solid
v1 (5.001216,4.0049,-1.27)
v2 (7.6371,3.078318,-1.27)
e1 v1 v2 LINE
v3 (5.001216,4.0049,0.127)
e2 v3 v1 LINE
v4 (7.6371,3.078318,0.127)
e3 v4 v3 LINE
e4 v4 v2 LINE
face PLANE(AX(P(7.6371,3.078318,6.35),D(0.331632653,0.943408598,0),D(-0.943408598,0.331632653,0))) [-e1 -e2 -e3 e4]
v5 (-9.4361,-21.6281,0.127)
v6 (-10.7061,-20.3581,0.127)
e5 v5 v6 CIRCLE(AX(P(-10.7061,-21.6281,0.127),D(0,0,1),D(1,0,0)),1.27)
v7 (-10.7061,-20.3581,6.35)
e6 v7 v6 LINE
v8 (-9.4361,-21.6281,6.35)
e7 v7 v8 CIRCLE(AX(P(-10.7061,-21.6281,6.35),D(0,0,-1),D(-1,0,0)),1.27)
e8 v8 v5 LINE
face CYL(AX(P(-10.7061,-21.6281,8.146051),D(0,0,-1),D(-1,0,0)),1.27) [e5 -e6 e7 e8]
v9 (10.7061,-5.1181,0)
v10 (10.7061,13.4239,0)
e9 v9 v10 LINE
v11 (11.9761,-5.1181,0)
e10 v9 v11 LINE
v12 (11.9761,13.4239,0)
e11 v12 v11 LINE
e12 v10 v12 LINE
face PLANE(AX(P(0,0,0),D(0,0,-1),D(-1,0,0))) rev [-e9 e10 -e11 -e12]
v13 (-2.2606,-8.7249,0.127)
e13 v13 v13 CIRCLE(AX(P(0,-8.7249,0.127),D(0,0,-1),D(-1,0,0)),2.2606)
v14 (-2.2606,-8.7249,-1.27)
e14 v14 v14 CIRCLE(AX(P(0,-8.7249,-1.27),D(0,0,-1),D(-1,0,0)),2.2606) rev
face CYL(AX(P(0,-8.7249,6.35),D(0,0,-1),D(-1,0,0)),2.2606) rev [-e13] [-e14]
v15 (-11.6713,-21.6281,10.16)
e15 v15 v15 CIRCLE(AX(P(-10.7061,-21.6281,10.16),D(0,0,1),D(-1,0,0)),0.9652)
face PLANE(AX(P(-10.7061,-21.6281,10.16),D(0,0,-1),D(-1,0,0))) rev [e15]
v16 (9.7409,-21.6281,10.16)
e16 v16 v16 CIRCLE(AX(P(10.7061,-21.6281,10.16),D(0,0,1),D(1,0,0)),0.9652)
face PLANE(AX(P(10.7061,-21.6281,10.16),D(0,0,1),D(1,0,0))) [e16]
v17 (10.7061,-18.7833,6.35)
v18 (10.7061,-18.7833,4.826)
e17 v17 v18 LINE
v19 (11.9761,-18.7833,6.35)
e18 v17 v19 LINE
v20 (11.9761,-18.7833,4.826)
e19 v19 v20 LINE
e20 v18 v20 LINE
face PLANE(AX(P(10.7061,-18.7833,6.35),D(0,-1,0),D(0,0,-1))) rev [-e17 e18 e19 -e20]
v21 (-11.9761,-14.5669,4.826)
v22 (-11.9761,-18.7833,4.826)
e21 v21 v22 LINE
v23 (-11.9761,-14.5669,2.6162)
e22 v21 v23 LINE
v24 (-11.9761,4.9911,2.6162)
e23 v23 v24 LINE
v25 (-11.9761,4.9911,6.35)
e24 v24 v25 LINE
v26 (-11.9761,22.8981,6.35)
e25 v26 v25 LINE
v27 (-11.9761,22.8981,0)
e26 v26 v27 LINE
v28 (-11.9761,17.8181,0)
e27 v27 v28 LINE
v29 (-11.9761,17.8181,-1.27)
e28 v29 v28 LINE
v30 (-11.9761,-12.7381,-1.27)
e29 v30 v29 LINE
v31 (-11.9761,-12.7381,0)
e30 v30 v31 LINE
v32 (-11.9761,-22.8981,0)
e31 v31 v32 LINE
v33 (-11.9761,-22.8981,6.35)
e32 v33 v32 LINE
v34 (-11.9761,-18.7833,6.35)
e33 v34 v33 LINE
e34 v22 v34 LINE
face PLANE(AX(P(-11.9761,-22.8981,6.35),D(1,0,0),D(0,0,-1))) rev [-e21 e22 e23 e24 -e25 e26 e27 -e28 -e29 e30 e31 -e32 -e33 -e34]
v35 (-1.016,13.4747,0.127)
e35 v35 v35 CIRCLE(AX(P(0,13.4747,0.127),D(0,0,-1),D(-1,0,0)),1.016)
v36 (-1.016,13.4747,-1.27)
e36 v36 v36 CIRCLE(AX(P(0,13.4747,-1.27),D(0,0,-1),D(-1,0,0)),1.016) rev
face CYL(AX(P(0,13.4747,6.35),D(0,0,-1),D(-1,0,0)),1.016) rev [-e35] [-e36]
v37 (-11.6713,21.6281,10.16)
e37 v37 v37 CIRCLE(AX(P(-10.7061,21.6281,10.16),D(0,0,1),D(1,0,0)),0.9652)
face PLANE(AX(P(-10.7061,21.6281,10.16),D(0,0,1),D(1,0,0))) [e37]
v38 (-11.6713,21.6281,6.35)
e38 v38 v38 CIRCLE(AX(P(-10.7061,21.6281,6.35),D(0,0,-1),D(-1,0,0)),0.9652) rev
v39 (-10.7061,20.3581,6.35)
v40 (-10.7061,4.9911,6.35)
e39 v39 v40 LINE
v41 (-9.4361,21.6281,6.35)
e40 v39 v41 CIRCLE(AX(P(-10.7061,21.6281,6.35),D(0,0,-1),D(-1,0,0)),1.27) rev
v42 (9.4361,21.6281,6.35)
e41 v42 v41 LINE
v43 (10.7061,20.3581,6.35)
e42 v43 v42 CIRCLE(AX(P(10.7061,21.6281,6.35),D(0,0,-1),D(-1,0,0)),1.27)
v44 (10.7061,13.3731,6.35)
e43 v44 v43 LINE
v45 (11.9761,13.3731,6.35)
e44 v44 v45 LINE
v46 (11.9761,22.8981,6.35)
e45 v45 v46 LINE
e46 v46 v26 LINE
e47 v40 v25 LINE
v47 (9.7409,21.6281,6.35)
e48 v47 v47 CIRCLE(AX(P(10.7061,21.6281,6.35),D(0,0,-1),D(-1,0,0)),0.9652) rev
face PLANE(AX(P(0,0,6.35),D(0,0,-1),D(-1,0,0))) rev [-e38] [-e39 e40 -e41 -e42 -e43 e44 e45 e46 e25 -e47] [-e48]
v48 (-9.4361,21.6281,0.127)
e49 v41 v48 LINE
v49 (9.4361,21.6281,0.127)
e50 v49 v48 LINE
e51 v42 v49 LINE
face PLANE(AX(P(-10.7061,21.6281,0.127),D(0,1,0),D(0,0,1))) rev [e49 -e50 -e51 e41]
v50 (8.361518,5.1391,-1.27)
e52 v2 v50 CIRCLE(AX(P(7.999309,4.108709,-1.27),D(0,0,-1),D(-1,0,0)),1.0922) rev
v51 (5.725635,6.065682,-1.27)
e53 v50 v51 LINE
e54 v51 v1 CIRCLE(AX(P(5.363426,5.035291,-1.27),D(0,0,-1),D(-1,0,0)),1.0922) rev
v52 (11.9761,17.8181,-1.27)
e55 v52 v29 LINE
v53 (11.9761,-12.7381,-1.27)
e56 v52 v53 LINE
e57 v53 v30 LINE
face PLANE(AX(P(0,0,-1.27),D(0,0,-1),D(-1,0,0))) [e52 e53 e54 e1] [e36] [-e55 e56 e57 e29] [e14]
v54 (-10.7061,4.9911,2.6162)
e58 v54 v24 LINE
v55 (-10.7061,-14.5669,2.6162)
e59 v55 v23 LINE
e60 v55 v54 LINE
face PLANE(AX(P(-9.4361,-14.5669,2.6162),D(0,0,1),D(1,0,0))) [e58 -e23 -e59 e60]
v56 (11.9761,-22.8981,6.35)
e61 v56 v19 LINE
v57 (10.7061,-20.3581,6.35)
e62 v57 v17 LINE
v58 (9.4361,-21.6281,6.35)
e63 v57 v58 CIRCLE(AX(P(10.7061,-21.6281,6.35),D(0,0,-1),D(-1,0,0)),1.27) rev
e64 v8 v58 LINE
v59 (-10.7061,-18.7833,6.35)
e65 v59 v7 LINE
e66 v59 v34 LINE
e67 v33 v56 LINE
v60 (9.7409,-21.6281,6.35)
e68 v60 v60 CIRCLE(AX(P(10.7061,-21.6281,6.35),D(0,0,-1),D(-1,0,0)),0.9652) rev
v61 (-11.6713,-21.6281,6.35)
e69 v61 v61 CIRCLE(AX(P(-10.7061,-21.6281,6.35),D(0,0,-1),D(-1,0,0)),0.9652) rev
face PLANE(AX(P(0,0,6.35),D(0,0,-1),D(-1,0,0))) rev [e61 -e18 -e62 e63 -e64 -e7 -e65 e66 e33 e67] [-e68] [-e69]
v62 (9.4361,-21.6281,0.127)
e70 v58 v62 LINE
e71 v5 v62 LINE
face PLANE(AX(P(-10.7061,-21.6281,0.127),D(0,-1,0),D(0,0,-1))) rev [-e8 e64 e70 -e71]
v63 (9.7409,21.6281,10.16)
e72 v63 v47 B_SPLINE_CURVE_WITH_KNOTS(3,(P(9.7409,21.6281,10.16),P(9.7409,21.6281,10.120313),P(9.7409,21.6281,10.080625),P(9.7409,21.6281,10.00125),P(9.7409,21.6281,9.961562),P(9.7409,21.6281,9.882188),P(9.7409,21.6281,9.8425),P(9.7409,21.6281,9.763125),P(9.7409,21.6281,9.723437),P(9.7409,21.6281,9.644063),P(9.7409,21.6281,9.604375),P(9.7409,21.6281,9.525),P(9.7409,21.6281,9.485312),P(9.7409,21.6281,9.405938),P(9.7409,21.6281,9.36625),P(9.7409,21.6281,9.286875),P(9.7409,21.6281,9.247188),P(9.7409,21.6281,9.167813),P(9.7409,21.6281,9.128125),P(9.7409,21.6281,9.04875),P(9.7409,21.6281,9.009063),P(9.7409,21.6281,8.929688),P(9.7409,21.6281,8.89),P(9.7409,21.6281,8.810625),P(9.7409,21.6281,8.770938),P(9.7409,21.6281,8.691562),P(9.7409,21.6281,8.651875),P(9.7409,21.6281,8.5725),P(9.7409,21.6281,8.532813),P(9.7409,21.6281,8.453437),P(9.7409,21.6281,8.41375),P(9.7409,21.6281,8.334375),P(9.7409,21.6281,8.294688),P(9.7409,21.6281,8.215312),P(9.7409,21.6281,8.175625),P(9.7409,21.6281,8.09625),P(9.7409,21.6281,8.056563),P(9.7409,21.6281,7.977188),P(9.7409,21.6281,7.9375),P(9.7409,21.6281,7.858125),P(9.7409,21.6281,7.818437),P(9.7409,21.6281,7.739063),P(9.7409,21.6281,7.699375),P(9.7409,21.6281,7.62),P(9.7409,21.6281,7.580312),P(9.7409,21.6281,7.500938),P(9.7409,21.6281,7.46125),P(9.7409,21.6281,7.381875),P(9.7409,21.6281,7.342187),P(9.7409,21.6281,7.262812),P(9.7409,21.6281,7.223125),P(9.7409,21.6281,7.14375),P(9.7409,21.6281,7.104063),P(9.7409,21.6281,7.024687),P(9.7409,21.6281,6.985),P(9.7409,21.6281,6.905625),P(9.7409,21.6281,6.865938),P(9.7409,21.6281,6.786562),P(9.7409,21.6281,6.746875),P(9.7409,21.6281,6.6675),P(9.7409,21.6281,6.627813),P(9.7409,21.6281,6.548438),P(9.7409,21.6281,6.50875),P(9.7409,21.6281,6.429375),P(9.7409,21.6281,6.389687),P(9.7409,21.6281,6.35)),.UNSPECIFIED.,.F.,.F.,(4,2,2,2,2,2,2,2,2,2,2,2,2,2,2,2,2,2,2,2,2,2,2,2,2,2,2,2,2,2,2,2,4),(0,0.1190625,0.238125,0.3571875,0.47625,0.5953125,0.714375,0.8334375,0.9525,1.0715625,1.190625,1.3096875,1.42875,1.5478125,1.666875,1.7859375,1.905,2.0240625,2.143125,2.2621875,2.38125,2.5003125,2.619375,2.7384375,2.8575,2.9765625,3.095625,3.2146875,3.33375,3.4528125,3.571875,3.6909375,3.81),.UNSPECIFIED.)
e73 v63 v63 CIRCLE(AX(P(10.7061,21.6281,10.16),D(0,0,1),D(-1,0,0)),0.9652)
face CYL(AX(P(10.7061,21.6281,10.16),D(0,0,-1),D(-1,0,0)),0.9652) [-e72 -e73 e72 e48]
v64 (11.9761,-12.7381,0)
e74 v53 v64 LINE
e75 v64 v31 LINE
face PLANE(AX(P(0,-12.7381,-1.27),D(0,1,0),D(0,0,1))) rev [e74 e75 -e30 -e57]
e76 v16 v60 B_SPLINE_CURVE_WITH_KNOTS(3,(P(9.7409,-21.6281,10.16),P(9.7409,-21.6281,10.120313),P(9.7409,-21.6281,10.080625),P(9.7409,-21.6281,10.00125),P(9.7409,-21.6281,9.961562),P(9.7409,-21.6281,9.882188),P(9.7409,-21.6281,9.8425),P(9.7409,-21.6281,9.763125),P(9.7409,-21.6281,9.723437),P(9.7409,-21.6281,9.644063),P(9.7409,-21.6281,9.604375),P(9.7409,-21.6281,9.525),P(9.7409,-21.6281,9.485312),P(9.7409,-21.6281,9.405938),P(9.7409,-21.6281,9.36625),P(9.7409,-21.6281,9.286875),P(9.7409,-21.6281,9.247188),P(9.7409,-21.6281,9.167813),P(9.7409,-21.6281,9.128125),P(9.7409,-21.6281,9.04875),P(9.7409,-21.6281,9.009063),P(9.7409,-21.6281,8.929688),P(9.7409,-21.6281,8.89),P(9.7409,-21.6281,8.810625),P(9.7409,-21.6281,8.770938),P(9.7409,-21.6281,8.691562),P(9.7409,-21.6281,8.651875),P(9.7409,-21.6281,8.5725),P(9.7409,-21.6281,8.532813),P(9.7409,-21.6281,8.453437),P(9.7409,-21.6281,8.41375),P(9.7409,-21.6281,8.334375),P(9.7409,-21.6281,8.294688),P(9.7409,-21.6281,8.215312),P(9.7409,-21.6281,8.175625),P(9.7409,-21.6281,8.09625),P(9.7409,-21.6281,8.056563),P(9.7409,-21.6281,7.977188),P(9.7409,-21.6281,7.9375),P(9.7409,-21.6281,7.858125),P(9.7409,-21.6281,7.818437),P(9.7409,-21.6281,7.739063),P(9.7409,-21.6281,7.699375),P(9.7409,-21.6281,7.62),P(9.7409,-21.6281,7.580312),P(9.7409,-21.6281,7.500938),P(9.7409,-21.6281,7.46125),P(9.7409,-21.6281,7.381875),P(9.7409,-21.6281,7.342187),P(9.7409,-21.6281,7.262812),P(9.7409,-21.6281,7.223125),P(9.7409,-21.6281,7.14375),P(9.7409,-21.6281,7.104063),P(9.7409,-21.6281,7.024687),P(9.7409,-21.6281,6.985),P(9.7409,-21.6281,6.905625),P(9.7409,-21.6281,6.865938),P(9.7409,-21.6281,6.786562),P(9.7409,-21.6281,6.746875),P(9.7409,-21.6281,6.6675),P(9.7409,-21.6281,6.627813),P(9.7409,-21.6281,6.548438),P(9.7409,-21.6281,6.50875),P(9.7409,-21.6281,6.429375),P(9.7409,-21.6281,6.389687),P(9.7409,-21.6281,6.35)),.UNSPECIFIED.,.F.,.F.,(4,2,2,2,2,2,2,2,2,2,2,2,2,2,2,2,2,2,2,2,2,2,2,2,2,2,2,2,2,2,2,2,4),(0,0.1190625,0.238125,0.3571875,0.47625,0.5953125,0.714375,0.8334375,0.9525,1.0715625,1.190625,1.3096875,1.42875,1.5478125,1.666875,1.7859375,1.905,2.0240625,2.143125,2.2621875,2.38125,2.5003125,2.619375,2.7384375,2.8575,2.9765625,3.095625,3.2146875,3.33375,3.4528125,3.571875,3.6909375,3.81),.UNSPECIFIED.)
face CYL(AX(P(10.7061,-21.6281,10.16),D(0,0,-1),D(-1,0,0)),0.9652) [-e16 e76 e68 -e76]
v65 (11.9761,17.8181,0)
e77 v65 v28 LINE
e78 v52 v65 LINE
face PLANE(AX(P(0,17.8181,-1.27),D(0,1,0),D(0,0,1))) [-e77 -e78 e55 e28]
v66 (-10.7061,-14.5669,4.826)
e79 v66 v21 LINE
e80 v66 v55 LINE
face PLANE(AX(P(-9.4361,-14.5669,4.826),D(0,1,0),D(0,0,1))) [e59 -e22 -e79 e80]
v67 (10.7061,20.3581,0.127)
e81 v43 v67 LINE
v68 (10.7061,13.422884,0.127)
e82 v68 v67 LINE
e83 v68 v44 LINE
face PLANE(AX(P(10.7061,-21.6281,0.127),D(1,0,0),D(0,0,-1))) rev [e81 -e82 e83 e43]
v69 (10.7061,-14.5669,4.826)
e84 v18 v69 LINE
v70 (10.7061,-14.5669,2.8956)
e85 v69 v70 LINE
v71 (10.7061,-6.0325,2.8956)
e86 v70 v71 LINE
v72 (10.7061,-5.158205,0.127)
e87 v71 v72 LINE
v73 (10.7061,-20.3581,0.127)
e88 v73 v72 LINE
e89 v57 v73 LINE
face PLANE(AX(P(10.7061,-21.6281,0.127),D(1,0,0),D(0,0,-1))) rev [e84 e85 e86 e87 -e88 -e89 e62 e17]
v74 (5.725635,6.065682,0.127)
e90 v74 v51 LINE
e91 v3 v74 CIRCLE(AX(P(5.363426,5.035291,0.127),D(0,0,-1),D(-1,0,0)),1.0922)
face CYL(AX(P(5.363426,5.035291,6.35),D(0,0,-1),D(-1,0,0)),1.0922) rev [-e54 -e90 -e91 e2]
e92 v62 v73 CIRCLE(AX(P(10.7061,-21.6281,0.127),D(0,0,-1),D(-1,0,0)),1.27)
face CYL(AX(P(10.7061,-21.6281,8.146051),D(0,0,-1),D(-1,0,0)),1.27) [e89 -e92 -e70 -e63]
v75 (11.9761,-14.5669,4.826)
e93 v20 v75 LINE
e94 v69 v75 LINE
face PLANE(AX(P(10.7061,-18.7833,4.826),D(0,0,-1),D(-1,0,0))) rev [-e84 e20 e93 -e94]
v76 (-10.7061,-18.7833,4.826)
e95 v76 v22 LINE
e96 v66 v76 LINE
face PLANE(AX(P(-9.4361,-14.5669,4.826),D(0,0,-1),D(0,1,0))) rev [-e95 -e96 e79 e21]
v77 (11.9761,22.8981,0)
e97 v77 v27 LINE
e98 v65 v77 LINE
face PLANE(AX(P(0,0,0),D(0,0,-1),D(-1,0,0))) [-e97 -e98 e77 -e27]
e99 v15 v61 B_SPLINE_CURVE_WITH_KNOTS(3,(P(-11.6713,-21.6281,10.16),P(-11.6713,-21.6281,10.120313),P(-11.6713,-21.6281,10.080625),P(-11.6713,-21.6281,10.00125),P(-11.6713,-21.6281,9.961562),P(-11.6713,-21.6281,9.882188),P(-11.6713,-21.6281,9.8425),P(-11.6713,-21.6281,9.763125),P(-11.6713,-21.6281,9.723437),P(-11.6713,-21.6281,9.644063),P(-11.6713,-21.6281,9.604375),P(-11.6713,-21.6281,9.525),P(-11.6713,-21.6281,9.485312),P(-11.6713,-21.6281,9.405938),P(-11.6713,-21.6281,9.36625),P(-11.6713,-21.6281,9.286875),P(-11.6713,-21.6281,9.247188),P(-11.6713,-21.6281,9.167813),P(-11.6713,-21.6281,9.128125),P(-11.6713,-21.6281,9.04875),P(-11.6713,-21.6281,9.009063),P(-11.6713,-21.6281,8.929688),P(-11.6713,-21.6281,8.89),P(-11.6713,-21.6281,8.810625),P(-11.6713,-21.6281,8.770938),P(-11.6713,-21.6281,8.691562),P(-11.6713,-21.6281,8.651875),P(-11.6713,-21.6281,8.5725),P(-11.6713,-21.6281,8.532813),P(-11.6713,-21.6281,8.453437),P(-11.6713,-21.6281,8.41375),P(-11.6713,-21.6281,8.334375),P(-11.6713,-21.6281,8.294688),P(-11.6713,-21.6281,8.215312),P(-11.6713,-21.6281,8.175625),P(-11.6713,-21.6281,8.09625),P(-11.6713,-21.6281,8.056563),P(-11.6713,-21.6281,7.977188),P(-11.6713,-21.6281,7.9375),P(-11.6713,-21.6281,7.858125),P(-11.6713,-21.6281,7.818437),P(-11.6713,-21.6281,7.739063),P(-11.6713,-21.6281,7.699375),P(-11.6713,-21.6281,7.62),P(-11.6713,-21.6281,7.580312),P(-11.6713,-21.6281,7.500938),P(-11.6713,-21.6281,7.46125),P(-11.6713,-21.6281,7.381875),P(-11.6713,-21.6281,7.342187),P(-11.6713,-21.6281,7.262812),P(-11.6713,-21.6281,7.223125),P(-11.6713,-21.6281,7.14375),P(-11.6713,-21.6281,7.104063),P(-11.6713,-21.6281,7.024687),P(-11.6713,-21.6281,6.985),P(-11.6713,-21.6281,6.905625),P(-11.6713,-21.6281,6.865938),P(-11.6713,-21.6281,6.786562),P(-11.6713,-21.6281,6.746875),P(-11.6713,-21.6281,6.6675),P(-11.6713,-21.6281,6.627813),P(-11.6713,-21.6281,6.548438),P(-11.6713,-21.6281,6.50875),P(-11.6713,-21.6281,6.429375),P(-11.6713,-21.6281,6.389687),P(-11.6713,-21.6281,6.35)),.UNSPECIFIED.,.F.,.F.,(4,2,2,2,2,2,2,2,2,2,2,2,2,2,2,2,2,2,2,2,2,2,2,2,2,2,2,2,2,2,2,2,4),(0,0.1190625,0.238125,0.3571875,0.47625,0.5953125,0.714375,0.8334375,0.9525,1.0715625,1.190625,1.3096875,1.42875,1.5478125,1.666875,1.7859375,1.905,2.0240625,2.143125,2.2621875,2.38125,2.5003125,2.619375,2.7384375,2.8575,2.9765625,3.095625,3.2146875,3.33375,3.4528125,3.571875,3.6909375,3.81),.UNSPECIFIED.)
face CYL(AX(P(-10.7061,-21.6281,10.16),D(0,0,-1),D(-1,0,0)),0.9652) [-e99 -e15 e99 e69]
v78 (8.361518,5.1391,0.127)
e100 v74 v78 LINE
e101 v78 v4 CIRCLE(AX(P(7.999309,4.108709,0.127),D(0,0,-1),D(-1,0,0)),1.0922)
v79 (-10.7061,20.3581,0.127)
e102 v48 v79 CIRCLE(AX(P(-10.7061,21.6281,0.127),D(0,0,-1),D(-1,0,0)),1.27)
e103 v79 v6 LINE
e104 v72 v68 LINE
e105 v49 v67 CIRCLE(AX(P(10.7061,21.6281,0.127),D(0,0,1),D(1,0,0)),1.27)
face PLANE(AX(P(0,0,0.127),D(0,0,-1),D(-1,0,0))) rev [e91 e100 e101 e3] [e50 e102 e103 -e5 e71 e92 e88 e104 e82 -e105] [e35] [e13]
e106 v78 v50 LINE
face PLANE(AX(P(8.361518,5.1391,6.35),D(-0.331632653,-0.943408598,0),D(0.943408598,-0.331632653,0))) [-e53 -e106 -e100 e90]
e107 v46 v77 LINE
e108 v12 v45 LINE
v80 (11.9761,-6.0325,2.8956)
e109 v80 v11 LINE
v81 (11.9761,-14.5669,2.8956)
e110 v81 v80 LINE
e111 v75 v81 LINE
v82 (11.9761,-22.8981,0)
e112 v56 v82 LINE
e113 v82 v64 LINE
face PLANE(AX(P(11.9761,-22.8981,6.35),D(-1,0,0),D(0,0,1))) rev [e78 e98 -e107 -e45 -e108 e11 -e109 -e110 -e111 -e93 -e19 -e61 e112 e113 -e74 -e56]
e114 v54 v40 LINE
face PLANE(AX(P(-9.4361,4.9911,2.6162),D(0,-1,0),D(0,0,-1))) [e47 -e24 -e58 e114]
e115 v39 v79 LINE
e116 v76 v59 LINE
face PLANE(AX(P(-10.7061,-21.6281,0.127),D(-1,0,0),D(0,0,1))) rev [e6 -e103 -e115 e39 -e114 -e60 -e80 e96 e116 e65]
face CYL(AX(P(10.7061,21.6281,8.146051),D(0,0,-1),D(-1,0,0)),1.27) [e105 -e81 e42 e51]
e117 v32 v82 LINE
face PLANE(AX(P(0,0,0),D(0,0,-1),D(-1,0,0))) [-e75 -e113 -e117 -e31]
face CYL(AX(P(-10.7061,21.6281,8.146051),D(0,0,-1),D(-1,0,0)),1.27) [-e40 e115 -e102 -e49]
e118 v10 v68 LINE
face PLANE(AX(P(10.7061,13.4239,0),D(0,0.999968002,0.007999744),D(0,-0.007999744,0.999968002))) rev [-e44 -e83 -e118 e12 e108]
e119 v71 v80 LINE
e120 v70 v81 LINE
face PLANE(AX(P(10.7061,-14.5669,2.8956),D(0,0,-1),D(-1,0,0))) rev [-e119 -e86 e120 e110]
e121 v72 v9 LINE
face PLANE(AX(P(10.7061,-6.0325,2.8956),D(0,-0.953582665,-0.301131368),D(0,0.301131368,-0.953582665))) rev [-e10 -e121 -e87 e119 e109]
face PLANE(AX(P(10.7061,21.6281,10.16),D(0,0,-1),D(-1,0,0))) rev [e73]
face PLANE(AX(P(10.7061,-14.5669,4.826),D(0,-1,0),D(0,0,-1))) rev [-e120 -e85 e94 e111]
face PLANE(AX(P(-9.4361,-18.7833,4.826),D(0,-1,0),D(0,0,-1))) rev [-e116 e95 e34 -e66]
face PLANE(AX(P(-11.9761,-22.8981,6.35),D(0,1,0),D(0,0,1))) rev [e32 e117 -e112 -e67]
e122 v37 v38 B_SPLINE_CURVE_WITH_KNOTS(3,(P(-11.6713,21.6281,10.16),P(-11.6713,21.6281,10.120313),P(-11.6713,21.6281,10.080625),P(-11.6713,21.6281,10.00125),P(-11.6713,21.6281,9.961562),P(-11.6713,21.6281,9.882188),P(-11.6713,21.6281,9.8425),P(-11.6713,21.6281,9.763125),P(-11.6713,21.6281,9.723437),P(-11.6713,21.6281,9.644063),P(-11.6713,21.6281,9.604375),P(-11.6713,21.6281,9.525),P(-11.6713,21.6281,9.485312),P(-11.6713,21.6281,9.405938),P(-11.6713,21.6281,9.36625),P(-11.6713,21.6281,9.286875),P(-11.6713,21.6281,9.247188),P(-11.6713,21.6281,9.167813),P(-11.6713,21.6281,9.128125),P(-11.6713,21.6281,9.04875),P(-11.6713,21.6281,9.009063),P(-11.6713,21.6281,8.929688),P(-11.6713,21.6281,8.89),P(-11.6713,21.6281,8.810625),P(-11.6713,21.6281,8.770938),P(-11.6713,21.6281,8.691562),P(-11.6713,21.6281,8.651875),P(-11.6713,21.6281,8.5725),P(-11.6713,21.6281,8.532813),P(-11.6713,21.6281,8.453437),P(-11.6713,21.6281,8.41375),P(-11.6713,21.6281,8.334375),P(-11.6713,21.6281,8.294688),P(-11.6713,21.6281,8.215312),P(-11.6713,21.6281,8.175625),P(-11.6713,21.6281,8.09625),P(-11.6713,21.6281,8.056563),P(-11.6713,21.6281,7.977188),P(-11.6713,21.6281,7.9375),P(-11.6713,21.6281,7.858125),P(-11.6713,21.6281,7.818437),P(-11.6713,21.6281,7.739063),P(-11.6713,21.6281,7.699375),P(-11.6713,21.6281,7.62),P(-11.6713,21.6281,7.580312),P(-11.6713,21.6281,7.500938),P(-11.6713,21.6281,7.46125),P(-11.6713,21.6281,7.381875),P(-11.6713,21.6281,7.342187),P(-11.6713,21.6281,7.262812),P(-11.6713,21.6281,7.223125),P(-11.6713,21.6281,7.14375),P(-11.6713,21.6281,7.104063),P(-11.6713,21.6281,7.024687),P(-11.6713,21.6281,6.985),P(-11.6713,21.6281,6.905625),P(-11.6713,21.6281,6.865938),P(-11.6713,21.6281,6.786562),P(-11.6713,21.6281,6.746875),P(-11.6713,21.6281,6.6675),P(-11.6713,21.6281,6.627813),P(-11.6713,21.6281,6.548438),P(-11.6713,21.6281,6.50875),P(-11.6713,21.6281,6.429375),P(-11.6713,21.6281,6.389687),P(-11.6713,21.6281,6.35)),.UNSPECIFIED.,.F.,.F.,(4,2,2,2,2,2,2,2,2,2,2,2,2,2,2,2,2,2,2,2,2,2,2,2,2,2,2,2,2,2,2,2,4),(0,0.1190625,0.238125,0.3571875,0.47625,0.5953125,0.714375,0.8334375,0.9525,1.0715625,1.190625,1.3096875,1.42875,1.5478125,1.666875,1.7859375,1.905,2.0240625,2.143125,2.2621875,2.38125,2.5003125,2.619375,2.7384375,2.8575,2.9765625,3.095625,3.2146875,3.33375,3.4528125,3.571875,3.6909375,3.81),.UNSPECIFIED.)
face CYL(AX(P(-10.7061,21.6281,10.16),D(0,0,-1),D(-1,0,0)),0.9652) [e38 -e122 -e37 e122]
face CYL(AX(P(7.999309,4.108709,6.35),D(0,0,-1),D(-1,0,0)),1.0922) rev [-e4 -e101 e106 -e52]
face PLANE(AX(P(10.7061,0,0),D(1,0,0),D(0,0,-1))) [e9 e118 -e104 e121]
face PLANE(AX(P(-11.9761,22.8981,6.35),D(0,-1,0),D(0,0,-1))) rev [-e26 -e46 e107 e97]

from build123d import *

# Parameters (mm, degrees)
SKETCH2_W                  = 23.9522
SKETCH2_H                  = 45.7962
SKETCH2_R                  = 2.2606
SKETCH2_R_2                = 1.016
BOSS_EXTRUDE1_DEPTH        = 6.35
SKETCH4_W                  = 21.4122
SKETCH4_H                  = 43.2562
CUT_EXTRUDE1_DEPTH         = 6.223
CUT_EXTRUDE3_DEPTH         = 2.54
CUT_EXTRUDE5_DEPTH         = 1.27
BOSS_EXTRUDE3_DEPTH        = 6.223
SKETCH12_R                 = 0.9652
BOSS_EXTRUDE13_DEPTH       = 3.81
BOSS_EXTRUDE15_OUTLINE_W   = 23.9522
BOSS_EXTRUDE15_OUTLINE_H   = 30.5562
BOSS_EXTRUDE15_OUTLINE_R   = 2.2606
BOSS_EXTRUDE15_OUTLINE_R_2 = 1.016
BOSS_EXTRUDE15_DEPTH       = 1.27


# Read off the part's stored shape, not the designer's step: Boss-Extrude15
with BuildPart() as part:
    # Sketch2 → Boss-Extrude1 (new body)
    with BuildSketch(Plane.XY):
        Rectangle(SKETCH2_W, SKETCH2_H)
        with Locations((0, -8.7249)):
            Circle(SKETCH2_R, mode=Mode.SUBTRACT)
        with Locations((0, 13.4747)):
            Circle(SKETCH2_R_2, mode=Mode.SUBTRACT)
        with BuildLine():
            Line((8.361518313, 5.139100055), (5.725634689, 6.065681687))
            ThreePointArc((5.725634689, 6.065681687), (4.333034634, 5.3975), (5.001216321, 4.004899945))
            Line((5.001216321, 4.004899945), (7.637099945, 3.078318313))
            ThreePointArc((7.637099945, 3.078318313), (9.0297, 3.7465), (8.361518313, 5.139100055))
        make_face(mode=Mode.SUBTRACT)
    extrude(amount=BOSS_EXTRUDE1_DEPTH)

    # Sketch4 → Cut-Extrude1 (cut)
    with BuildSketch(Plane.XY.offset(6.35)):
        Rectangle(SKETCH4_W, SKETCH4_H)
    extrude(amount=-CUT_EXTRUDE1_DEPTH, mode=Mode.SUBTRACT)

    # Sketch6 → Cut-Extrude3 (cut)
    with BuildSketch(Plane.ZY.offset(11.9761)):
        Polygon((4.826, -14.5669), (2.6162, -14.5669), (2.6162, 4.9911), (6.35, 4.9911), (6.35, -18.7833), (4.826, -18.7833), align=None)
    extrude(amount=-CUT_EXTRUDE3_DEPTH, mode=Mode.SUBTRACT)

    # Sketch8 → Cut-Extrude5 (cut)
    with BuildSketch(Plane(origin=(11.9761, 0, 0), x_dir=(0, 0, -1), z_dir=(1, 0, 0))):
        Polygon((-6.35, -18.7833), (-4.826, -18.7833), (-4.826, -14.5669), (-2.8956, -14.5669), (-2.8956, -6.0325), (0, -5.1181), (0, 13.4239), (-6.35, 13.3731), align=None)
    extrude(amount=-CUT_EXTRUDE5_DEPTH, mode=Mode.SUBTRACT)

    # Sketch10 → Boss-Extrude3 (add)
    with BuildSketch(Plane.XY.offset(0.127)):
        with BuildLine():
            ThreePointArc((-10.7061, 20.3581), (-9.808074388, 20.730074388), (-9.4361, 21.6281))
            Line((-9.4361, 21.6281), (-10.7061, 21.6281))
            Line((-10.7061, 21.6281), (-10.7061, 20.3581))
        make_face()
        with BuildLine():
            ThreePointArc((9.4361, 21.6281), (9.808074388, 20.730074388), (10.7061, 20.3581))
            Line((10.7061, 20.3581), (10.7061, 21.6281))
            Line((10.7061, 21.6281), (9.4361, 21.6281))
        make_face()
        with BuildLine():
            ThreePointArc((-9.4361, -21.6281), (-9.808074388, -20.730074388), (-10.7061, -20.3581))
            Line((-10.7061, -20.3581), (-10.7061, -21.6281))
            Line((-10.7061, -21.6281), (-9.4361, -21.6281))
        make_face()
        with BuildLine():
            Line((10.7061, -21.6281), (10.7061, -20.3581))
            ThreePointArc((10.7061, -20.3581), (9.808074388, -20.730074388), (9.4361, -21.6281))
            Line((9.4361, -21.6281), (10.7061, -21.6281))
        make_face()
    extrude(amount=BOSS_EXTRUDE3_DEPTH)

    # Sketch12 → Boss-Extrude13 (add)
    with BuildSketch(Plane.XY.offset(6.35)):
        with Locations(Location((-10.7061, 21.6281, 0), (0, 0, 180))):
            Circle(SKETCH12_R)
        with Locations(Location((10.7061, 21.6281, 0), (0, 0, 180))):
            Circle(SKETCH12_R)
        with Locations(Location((10.7061, -21.6281, 0), (0, 0, 180))):
            Circle(SKETCH12_R)
        with Locations(Location((-10.7061, -21.6281, 0), (0, 0, 180))):
            Circle(SKETCH12_R)
    extrude(amount=BOSS_EXTRUDE13_DEPTH)

    # Boss-Extrude15 outline → Boss-Extrude15 (add)
    with BuildSketch(Plane(origin=(0, 0, 0), x_dir=(-1, 0, 0), z_dir=(0, 0, -1))):
        with Locations((0, 2.54)):
            Rectangle(BOSS_EXTRUDE15_OUTLINE_W, BOSS_EXTRUDE15_OUTLINE_H)
        with Locations((0, -8.7249)):
            Circle(BOSS_EXTRUDE15_OUTLINE_R, mode=Mode.SUBTRACT)
        with BuildLine():
            ThreePointArc((-7.637099945, 3.078318313), (-9.0297, 3.7465), (-8.361518313, 5.139100055))
            Line((-8.361518313, 5.139100055), (-5.725634689, 6.065681687))
            ThreePointArc((-5.725634689, 6.065681687), (-4.333034634, 5.3975), (-5.001216321, 4.004899945))
            Line((-5.001216321, 4.004899945), (-7.637099945, 3.078318313))
        make_face(mode=Mode.SUBTRACT)
        with Locations((0, 13.4747)):
            Circle(BOSS_EXTRUDE15_OUTLINE_R_2, mode=Mode.SUBTRACT)
    extrude(amount=BOSS_EXTRUDE15_DEPTH)


solid = part.part
